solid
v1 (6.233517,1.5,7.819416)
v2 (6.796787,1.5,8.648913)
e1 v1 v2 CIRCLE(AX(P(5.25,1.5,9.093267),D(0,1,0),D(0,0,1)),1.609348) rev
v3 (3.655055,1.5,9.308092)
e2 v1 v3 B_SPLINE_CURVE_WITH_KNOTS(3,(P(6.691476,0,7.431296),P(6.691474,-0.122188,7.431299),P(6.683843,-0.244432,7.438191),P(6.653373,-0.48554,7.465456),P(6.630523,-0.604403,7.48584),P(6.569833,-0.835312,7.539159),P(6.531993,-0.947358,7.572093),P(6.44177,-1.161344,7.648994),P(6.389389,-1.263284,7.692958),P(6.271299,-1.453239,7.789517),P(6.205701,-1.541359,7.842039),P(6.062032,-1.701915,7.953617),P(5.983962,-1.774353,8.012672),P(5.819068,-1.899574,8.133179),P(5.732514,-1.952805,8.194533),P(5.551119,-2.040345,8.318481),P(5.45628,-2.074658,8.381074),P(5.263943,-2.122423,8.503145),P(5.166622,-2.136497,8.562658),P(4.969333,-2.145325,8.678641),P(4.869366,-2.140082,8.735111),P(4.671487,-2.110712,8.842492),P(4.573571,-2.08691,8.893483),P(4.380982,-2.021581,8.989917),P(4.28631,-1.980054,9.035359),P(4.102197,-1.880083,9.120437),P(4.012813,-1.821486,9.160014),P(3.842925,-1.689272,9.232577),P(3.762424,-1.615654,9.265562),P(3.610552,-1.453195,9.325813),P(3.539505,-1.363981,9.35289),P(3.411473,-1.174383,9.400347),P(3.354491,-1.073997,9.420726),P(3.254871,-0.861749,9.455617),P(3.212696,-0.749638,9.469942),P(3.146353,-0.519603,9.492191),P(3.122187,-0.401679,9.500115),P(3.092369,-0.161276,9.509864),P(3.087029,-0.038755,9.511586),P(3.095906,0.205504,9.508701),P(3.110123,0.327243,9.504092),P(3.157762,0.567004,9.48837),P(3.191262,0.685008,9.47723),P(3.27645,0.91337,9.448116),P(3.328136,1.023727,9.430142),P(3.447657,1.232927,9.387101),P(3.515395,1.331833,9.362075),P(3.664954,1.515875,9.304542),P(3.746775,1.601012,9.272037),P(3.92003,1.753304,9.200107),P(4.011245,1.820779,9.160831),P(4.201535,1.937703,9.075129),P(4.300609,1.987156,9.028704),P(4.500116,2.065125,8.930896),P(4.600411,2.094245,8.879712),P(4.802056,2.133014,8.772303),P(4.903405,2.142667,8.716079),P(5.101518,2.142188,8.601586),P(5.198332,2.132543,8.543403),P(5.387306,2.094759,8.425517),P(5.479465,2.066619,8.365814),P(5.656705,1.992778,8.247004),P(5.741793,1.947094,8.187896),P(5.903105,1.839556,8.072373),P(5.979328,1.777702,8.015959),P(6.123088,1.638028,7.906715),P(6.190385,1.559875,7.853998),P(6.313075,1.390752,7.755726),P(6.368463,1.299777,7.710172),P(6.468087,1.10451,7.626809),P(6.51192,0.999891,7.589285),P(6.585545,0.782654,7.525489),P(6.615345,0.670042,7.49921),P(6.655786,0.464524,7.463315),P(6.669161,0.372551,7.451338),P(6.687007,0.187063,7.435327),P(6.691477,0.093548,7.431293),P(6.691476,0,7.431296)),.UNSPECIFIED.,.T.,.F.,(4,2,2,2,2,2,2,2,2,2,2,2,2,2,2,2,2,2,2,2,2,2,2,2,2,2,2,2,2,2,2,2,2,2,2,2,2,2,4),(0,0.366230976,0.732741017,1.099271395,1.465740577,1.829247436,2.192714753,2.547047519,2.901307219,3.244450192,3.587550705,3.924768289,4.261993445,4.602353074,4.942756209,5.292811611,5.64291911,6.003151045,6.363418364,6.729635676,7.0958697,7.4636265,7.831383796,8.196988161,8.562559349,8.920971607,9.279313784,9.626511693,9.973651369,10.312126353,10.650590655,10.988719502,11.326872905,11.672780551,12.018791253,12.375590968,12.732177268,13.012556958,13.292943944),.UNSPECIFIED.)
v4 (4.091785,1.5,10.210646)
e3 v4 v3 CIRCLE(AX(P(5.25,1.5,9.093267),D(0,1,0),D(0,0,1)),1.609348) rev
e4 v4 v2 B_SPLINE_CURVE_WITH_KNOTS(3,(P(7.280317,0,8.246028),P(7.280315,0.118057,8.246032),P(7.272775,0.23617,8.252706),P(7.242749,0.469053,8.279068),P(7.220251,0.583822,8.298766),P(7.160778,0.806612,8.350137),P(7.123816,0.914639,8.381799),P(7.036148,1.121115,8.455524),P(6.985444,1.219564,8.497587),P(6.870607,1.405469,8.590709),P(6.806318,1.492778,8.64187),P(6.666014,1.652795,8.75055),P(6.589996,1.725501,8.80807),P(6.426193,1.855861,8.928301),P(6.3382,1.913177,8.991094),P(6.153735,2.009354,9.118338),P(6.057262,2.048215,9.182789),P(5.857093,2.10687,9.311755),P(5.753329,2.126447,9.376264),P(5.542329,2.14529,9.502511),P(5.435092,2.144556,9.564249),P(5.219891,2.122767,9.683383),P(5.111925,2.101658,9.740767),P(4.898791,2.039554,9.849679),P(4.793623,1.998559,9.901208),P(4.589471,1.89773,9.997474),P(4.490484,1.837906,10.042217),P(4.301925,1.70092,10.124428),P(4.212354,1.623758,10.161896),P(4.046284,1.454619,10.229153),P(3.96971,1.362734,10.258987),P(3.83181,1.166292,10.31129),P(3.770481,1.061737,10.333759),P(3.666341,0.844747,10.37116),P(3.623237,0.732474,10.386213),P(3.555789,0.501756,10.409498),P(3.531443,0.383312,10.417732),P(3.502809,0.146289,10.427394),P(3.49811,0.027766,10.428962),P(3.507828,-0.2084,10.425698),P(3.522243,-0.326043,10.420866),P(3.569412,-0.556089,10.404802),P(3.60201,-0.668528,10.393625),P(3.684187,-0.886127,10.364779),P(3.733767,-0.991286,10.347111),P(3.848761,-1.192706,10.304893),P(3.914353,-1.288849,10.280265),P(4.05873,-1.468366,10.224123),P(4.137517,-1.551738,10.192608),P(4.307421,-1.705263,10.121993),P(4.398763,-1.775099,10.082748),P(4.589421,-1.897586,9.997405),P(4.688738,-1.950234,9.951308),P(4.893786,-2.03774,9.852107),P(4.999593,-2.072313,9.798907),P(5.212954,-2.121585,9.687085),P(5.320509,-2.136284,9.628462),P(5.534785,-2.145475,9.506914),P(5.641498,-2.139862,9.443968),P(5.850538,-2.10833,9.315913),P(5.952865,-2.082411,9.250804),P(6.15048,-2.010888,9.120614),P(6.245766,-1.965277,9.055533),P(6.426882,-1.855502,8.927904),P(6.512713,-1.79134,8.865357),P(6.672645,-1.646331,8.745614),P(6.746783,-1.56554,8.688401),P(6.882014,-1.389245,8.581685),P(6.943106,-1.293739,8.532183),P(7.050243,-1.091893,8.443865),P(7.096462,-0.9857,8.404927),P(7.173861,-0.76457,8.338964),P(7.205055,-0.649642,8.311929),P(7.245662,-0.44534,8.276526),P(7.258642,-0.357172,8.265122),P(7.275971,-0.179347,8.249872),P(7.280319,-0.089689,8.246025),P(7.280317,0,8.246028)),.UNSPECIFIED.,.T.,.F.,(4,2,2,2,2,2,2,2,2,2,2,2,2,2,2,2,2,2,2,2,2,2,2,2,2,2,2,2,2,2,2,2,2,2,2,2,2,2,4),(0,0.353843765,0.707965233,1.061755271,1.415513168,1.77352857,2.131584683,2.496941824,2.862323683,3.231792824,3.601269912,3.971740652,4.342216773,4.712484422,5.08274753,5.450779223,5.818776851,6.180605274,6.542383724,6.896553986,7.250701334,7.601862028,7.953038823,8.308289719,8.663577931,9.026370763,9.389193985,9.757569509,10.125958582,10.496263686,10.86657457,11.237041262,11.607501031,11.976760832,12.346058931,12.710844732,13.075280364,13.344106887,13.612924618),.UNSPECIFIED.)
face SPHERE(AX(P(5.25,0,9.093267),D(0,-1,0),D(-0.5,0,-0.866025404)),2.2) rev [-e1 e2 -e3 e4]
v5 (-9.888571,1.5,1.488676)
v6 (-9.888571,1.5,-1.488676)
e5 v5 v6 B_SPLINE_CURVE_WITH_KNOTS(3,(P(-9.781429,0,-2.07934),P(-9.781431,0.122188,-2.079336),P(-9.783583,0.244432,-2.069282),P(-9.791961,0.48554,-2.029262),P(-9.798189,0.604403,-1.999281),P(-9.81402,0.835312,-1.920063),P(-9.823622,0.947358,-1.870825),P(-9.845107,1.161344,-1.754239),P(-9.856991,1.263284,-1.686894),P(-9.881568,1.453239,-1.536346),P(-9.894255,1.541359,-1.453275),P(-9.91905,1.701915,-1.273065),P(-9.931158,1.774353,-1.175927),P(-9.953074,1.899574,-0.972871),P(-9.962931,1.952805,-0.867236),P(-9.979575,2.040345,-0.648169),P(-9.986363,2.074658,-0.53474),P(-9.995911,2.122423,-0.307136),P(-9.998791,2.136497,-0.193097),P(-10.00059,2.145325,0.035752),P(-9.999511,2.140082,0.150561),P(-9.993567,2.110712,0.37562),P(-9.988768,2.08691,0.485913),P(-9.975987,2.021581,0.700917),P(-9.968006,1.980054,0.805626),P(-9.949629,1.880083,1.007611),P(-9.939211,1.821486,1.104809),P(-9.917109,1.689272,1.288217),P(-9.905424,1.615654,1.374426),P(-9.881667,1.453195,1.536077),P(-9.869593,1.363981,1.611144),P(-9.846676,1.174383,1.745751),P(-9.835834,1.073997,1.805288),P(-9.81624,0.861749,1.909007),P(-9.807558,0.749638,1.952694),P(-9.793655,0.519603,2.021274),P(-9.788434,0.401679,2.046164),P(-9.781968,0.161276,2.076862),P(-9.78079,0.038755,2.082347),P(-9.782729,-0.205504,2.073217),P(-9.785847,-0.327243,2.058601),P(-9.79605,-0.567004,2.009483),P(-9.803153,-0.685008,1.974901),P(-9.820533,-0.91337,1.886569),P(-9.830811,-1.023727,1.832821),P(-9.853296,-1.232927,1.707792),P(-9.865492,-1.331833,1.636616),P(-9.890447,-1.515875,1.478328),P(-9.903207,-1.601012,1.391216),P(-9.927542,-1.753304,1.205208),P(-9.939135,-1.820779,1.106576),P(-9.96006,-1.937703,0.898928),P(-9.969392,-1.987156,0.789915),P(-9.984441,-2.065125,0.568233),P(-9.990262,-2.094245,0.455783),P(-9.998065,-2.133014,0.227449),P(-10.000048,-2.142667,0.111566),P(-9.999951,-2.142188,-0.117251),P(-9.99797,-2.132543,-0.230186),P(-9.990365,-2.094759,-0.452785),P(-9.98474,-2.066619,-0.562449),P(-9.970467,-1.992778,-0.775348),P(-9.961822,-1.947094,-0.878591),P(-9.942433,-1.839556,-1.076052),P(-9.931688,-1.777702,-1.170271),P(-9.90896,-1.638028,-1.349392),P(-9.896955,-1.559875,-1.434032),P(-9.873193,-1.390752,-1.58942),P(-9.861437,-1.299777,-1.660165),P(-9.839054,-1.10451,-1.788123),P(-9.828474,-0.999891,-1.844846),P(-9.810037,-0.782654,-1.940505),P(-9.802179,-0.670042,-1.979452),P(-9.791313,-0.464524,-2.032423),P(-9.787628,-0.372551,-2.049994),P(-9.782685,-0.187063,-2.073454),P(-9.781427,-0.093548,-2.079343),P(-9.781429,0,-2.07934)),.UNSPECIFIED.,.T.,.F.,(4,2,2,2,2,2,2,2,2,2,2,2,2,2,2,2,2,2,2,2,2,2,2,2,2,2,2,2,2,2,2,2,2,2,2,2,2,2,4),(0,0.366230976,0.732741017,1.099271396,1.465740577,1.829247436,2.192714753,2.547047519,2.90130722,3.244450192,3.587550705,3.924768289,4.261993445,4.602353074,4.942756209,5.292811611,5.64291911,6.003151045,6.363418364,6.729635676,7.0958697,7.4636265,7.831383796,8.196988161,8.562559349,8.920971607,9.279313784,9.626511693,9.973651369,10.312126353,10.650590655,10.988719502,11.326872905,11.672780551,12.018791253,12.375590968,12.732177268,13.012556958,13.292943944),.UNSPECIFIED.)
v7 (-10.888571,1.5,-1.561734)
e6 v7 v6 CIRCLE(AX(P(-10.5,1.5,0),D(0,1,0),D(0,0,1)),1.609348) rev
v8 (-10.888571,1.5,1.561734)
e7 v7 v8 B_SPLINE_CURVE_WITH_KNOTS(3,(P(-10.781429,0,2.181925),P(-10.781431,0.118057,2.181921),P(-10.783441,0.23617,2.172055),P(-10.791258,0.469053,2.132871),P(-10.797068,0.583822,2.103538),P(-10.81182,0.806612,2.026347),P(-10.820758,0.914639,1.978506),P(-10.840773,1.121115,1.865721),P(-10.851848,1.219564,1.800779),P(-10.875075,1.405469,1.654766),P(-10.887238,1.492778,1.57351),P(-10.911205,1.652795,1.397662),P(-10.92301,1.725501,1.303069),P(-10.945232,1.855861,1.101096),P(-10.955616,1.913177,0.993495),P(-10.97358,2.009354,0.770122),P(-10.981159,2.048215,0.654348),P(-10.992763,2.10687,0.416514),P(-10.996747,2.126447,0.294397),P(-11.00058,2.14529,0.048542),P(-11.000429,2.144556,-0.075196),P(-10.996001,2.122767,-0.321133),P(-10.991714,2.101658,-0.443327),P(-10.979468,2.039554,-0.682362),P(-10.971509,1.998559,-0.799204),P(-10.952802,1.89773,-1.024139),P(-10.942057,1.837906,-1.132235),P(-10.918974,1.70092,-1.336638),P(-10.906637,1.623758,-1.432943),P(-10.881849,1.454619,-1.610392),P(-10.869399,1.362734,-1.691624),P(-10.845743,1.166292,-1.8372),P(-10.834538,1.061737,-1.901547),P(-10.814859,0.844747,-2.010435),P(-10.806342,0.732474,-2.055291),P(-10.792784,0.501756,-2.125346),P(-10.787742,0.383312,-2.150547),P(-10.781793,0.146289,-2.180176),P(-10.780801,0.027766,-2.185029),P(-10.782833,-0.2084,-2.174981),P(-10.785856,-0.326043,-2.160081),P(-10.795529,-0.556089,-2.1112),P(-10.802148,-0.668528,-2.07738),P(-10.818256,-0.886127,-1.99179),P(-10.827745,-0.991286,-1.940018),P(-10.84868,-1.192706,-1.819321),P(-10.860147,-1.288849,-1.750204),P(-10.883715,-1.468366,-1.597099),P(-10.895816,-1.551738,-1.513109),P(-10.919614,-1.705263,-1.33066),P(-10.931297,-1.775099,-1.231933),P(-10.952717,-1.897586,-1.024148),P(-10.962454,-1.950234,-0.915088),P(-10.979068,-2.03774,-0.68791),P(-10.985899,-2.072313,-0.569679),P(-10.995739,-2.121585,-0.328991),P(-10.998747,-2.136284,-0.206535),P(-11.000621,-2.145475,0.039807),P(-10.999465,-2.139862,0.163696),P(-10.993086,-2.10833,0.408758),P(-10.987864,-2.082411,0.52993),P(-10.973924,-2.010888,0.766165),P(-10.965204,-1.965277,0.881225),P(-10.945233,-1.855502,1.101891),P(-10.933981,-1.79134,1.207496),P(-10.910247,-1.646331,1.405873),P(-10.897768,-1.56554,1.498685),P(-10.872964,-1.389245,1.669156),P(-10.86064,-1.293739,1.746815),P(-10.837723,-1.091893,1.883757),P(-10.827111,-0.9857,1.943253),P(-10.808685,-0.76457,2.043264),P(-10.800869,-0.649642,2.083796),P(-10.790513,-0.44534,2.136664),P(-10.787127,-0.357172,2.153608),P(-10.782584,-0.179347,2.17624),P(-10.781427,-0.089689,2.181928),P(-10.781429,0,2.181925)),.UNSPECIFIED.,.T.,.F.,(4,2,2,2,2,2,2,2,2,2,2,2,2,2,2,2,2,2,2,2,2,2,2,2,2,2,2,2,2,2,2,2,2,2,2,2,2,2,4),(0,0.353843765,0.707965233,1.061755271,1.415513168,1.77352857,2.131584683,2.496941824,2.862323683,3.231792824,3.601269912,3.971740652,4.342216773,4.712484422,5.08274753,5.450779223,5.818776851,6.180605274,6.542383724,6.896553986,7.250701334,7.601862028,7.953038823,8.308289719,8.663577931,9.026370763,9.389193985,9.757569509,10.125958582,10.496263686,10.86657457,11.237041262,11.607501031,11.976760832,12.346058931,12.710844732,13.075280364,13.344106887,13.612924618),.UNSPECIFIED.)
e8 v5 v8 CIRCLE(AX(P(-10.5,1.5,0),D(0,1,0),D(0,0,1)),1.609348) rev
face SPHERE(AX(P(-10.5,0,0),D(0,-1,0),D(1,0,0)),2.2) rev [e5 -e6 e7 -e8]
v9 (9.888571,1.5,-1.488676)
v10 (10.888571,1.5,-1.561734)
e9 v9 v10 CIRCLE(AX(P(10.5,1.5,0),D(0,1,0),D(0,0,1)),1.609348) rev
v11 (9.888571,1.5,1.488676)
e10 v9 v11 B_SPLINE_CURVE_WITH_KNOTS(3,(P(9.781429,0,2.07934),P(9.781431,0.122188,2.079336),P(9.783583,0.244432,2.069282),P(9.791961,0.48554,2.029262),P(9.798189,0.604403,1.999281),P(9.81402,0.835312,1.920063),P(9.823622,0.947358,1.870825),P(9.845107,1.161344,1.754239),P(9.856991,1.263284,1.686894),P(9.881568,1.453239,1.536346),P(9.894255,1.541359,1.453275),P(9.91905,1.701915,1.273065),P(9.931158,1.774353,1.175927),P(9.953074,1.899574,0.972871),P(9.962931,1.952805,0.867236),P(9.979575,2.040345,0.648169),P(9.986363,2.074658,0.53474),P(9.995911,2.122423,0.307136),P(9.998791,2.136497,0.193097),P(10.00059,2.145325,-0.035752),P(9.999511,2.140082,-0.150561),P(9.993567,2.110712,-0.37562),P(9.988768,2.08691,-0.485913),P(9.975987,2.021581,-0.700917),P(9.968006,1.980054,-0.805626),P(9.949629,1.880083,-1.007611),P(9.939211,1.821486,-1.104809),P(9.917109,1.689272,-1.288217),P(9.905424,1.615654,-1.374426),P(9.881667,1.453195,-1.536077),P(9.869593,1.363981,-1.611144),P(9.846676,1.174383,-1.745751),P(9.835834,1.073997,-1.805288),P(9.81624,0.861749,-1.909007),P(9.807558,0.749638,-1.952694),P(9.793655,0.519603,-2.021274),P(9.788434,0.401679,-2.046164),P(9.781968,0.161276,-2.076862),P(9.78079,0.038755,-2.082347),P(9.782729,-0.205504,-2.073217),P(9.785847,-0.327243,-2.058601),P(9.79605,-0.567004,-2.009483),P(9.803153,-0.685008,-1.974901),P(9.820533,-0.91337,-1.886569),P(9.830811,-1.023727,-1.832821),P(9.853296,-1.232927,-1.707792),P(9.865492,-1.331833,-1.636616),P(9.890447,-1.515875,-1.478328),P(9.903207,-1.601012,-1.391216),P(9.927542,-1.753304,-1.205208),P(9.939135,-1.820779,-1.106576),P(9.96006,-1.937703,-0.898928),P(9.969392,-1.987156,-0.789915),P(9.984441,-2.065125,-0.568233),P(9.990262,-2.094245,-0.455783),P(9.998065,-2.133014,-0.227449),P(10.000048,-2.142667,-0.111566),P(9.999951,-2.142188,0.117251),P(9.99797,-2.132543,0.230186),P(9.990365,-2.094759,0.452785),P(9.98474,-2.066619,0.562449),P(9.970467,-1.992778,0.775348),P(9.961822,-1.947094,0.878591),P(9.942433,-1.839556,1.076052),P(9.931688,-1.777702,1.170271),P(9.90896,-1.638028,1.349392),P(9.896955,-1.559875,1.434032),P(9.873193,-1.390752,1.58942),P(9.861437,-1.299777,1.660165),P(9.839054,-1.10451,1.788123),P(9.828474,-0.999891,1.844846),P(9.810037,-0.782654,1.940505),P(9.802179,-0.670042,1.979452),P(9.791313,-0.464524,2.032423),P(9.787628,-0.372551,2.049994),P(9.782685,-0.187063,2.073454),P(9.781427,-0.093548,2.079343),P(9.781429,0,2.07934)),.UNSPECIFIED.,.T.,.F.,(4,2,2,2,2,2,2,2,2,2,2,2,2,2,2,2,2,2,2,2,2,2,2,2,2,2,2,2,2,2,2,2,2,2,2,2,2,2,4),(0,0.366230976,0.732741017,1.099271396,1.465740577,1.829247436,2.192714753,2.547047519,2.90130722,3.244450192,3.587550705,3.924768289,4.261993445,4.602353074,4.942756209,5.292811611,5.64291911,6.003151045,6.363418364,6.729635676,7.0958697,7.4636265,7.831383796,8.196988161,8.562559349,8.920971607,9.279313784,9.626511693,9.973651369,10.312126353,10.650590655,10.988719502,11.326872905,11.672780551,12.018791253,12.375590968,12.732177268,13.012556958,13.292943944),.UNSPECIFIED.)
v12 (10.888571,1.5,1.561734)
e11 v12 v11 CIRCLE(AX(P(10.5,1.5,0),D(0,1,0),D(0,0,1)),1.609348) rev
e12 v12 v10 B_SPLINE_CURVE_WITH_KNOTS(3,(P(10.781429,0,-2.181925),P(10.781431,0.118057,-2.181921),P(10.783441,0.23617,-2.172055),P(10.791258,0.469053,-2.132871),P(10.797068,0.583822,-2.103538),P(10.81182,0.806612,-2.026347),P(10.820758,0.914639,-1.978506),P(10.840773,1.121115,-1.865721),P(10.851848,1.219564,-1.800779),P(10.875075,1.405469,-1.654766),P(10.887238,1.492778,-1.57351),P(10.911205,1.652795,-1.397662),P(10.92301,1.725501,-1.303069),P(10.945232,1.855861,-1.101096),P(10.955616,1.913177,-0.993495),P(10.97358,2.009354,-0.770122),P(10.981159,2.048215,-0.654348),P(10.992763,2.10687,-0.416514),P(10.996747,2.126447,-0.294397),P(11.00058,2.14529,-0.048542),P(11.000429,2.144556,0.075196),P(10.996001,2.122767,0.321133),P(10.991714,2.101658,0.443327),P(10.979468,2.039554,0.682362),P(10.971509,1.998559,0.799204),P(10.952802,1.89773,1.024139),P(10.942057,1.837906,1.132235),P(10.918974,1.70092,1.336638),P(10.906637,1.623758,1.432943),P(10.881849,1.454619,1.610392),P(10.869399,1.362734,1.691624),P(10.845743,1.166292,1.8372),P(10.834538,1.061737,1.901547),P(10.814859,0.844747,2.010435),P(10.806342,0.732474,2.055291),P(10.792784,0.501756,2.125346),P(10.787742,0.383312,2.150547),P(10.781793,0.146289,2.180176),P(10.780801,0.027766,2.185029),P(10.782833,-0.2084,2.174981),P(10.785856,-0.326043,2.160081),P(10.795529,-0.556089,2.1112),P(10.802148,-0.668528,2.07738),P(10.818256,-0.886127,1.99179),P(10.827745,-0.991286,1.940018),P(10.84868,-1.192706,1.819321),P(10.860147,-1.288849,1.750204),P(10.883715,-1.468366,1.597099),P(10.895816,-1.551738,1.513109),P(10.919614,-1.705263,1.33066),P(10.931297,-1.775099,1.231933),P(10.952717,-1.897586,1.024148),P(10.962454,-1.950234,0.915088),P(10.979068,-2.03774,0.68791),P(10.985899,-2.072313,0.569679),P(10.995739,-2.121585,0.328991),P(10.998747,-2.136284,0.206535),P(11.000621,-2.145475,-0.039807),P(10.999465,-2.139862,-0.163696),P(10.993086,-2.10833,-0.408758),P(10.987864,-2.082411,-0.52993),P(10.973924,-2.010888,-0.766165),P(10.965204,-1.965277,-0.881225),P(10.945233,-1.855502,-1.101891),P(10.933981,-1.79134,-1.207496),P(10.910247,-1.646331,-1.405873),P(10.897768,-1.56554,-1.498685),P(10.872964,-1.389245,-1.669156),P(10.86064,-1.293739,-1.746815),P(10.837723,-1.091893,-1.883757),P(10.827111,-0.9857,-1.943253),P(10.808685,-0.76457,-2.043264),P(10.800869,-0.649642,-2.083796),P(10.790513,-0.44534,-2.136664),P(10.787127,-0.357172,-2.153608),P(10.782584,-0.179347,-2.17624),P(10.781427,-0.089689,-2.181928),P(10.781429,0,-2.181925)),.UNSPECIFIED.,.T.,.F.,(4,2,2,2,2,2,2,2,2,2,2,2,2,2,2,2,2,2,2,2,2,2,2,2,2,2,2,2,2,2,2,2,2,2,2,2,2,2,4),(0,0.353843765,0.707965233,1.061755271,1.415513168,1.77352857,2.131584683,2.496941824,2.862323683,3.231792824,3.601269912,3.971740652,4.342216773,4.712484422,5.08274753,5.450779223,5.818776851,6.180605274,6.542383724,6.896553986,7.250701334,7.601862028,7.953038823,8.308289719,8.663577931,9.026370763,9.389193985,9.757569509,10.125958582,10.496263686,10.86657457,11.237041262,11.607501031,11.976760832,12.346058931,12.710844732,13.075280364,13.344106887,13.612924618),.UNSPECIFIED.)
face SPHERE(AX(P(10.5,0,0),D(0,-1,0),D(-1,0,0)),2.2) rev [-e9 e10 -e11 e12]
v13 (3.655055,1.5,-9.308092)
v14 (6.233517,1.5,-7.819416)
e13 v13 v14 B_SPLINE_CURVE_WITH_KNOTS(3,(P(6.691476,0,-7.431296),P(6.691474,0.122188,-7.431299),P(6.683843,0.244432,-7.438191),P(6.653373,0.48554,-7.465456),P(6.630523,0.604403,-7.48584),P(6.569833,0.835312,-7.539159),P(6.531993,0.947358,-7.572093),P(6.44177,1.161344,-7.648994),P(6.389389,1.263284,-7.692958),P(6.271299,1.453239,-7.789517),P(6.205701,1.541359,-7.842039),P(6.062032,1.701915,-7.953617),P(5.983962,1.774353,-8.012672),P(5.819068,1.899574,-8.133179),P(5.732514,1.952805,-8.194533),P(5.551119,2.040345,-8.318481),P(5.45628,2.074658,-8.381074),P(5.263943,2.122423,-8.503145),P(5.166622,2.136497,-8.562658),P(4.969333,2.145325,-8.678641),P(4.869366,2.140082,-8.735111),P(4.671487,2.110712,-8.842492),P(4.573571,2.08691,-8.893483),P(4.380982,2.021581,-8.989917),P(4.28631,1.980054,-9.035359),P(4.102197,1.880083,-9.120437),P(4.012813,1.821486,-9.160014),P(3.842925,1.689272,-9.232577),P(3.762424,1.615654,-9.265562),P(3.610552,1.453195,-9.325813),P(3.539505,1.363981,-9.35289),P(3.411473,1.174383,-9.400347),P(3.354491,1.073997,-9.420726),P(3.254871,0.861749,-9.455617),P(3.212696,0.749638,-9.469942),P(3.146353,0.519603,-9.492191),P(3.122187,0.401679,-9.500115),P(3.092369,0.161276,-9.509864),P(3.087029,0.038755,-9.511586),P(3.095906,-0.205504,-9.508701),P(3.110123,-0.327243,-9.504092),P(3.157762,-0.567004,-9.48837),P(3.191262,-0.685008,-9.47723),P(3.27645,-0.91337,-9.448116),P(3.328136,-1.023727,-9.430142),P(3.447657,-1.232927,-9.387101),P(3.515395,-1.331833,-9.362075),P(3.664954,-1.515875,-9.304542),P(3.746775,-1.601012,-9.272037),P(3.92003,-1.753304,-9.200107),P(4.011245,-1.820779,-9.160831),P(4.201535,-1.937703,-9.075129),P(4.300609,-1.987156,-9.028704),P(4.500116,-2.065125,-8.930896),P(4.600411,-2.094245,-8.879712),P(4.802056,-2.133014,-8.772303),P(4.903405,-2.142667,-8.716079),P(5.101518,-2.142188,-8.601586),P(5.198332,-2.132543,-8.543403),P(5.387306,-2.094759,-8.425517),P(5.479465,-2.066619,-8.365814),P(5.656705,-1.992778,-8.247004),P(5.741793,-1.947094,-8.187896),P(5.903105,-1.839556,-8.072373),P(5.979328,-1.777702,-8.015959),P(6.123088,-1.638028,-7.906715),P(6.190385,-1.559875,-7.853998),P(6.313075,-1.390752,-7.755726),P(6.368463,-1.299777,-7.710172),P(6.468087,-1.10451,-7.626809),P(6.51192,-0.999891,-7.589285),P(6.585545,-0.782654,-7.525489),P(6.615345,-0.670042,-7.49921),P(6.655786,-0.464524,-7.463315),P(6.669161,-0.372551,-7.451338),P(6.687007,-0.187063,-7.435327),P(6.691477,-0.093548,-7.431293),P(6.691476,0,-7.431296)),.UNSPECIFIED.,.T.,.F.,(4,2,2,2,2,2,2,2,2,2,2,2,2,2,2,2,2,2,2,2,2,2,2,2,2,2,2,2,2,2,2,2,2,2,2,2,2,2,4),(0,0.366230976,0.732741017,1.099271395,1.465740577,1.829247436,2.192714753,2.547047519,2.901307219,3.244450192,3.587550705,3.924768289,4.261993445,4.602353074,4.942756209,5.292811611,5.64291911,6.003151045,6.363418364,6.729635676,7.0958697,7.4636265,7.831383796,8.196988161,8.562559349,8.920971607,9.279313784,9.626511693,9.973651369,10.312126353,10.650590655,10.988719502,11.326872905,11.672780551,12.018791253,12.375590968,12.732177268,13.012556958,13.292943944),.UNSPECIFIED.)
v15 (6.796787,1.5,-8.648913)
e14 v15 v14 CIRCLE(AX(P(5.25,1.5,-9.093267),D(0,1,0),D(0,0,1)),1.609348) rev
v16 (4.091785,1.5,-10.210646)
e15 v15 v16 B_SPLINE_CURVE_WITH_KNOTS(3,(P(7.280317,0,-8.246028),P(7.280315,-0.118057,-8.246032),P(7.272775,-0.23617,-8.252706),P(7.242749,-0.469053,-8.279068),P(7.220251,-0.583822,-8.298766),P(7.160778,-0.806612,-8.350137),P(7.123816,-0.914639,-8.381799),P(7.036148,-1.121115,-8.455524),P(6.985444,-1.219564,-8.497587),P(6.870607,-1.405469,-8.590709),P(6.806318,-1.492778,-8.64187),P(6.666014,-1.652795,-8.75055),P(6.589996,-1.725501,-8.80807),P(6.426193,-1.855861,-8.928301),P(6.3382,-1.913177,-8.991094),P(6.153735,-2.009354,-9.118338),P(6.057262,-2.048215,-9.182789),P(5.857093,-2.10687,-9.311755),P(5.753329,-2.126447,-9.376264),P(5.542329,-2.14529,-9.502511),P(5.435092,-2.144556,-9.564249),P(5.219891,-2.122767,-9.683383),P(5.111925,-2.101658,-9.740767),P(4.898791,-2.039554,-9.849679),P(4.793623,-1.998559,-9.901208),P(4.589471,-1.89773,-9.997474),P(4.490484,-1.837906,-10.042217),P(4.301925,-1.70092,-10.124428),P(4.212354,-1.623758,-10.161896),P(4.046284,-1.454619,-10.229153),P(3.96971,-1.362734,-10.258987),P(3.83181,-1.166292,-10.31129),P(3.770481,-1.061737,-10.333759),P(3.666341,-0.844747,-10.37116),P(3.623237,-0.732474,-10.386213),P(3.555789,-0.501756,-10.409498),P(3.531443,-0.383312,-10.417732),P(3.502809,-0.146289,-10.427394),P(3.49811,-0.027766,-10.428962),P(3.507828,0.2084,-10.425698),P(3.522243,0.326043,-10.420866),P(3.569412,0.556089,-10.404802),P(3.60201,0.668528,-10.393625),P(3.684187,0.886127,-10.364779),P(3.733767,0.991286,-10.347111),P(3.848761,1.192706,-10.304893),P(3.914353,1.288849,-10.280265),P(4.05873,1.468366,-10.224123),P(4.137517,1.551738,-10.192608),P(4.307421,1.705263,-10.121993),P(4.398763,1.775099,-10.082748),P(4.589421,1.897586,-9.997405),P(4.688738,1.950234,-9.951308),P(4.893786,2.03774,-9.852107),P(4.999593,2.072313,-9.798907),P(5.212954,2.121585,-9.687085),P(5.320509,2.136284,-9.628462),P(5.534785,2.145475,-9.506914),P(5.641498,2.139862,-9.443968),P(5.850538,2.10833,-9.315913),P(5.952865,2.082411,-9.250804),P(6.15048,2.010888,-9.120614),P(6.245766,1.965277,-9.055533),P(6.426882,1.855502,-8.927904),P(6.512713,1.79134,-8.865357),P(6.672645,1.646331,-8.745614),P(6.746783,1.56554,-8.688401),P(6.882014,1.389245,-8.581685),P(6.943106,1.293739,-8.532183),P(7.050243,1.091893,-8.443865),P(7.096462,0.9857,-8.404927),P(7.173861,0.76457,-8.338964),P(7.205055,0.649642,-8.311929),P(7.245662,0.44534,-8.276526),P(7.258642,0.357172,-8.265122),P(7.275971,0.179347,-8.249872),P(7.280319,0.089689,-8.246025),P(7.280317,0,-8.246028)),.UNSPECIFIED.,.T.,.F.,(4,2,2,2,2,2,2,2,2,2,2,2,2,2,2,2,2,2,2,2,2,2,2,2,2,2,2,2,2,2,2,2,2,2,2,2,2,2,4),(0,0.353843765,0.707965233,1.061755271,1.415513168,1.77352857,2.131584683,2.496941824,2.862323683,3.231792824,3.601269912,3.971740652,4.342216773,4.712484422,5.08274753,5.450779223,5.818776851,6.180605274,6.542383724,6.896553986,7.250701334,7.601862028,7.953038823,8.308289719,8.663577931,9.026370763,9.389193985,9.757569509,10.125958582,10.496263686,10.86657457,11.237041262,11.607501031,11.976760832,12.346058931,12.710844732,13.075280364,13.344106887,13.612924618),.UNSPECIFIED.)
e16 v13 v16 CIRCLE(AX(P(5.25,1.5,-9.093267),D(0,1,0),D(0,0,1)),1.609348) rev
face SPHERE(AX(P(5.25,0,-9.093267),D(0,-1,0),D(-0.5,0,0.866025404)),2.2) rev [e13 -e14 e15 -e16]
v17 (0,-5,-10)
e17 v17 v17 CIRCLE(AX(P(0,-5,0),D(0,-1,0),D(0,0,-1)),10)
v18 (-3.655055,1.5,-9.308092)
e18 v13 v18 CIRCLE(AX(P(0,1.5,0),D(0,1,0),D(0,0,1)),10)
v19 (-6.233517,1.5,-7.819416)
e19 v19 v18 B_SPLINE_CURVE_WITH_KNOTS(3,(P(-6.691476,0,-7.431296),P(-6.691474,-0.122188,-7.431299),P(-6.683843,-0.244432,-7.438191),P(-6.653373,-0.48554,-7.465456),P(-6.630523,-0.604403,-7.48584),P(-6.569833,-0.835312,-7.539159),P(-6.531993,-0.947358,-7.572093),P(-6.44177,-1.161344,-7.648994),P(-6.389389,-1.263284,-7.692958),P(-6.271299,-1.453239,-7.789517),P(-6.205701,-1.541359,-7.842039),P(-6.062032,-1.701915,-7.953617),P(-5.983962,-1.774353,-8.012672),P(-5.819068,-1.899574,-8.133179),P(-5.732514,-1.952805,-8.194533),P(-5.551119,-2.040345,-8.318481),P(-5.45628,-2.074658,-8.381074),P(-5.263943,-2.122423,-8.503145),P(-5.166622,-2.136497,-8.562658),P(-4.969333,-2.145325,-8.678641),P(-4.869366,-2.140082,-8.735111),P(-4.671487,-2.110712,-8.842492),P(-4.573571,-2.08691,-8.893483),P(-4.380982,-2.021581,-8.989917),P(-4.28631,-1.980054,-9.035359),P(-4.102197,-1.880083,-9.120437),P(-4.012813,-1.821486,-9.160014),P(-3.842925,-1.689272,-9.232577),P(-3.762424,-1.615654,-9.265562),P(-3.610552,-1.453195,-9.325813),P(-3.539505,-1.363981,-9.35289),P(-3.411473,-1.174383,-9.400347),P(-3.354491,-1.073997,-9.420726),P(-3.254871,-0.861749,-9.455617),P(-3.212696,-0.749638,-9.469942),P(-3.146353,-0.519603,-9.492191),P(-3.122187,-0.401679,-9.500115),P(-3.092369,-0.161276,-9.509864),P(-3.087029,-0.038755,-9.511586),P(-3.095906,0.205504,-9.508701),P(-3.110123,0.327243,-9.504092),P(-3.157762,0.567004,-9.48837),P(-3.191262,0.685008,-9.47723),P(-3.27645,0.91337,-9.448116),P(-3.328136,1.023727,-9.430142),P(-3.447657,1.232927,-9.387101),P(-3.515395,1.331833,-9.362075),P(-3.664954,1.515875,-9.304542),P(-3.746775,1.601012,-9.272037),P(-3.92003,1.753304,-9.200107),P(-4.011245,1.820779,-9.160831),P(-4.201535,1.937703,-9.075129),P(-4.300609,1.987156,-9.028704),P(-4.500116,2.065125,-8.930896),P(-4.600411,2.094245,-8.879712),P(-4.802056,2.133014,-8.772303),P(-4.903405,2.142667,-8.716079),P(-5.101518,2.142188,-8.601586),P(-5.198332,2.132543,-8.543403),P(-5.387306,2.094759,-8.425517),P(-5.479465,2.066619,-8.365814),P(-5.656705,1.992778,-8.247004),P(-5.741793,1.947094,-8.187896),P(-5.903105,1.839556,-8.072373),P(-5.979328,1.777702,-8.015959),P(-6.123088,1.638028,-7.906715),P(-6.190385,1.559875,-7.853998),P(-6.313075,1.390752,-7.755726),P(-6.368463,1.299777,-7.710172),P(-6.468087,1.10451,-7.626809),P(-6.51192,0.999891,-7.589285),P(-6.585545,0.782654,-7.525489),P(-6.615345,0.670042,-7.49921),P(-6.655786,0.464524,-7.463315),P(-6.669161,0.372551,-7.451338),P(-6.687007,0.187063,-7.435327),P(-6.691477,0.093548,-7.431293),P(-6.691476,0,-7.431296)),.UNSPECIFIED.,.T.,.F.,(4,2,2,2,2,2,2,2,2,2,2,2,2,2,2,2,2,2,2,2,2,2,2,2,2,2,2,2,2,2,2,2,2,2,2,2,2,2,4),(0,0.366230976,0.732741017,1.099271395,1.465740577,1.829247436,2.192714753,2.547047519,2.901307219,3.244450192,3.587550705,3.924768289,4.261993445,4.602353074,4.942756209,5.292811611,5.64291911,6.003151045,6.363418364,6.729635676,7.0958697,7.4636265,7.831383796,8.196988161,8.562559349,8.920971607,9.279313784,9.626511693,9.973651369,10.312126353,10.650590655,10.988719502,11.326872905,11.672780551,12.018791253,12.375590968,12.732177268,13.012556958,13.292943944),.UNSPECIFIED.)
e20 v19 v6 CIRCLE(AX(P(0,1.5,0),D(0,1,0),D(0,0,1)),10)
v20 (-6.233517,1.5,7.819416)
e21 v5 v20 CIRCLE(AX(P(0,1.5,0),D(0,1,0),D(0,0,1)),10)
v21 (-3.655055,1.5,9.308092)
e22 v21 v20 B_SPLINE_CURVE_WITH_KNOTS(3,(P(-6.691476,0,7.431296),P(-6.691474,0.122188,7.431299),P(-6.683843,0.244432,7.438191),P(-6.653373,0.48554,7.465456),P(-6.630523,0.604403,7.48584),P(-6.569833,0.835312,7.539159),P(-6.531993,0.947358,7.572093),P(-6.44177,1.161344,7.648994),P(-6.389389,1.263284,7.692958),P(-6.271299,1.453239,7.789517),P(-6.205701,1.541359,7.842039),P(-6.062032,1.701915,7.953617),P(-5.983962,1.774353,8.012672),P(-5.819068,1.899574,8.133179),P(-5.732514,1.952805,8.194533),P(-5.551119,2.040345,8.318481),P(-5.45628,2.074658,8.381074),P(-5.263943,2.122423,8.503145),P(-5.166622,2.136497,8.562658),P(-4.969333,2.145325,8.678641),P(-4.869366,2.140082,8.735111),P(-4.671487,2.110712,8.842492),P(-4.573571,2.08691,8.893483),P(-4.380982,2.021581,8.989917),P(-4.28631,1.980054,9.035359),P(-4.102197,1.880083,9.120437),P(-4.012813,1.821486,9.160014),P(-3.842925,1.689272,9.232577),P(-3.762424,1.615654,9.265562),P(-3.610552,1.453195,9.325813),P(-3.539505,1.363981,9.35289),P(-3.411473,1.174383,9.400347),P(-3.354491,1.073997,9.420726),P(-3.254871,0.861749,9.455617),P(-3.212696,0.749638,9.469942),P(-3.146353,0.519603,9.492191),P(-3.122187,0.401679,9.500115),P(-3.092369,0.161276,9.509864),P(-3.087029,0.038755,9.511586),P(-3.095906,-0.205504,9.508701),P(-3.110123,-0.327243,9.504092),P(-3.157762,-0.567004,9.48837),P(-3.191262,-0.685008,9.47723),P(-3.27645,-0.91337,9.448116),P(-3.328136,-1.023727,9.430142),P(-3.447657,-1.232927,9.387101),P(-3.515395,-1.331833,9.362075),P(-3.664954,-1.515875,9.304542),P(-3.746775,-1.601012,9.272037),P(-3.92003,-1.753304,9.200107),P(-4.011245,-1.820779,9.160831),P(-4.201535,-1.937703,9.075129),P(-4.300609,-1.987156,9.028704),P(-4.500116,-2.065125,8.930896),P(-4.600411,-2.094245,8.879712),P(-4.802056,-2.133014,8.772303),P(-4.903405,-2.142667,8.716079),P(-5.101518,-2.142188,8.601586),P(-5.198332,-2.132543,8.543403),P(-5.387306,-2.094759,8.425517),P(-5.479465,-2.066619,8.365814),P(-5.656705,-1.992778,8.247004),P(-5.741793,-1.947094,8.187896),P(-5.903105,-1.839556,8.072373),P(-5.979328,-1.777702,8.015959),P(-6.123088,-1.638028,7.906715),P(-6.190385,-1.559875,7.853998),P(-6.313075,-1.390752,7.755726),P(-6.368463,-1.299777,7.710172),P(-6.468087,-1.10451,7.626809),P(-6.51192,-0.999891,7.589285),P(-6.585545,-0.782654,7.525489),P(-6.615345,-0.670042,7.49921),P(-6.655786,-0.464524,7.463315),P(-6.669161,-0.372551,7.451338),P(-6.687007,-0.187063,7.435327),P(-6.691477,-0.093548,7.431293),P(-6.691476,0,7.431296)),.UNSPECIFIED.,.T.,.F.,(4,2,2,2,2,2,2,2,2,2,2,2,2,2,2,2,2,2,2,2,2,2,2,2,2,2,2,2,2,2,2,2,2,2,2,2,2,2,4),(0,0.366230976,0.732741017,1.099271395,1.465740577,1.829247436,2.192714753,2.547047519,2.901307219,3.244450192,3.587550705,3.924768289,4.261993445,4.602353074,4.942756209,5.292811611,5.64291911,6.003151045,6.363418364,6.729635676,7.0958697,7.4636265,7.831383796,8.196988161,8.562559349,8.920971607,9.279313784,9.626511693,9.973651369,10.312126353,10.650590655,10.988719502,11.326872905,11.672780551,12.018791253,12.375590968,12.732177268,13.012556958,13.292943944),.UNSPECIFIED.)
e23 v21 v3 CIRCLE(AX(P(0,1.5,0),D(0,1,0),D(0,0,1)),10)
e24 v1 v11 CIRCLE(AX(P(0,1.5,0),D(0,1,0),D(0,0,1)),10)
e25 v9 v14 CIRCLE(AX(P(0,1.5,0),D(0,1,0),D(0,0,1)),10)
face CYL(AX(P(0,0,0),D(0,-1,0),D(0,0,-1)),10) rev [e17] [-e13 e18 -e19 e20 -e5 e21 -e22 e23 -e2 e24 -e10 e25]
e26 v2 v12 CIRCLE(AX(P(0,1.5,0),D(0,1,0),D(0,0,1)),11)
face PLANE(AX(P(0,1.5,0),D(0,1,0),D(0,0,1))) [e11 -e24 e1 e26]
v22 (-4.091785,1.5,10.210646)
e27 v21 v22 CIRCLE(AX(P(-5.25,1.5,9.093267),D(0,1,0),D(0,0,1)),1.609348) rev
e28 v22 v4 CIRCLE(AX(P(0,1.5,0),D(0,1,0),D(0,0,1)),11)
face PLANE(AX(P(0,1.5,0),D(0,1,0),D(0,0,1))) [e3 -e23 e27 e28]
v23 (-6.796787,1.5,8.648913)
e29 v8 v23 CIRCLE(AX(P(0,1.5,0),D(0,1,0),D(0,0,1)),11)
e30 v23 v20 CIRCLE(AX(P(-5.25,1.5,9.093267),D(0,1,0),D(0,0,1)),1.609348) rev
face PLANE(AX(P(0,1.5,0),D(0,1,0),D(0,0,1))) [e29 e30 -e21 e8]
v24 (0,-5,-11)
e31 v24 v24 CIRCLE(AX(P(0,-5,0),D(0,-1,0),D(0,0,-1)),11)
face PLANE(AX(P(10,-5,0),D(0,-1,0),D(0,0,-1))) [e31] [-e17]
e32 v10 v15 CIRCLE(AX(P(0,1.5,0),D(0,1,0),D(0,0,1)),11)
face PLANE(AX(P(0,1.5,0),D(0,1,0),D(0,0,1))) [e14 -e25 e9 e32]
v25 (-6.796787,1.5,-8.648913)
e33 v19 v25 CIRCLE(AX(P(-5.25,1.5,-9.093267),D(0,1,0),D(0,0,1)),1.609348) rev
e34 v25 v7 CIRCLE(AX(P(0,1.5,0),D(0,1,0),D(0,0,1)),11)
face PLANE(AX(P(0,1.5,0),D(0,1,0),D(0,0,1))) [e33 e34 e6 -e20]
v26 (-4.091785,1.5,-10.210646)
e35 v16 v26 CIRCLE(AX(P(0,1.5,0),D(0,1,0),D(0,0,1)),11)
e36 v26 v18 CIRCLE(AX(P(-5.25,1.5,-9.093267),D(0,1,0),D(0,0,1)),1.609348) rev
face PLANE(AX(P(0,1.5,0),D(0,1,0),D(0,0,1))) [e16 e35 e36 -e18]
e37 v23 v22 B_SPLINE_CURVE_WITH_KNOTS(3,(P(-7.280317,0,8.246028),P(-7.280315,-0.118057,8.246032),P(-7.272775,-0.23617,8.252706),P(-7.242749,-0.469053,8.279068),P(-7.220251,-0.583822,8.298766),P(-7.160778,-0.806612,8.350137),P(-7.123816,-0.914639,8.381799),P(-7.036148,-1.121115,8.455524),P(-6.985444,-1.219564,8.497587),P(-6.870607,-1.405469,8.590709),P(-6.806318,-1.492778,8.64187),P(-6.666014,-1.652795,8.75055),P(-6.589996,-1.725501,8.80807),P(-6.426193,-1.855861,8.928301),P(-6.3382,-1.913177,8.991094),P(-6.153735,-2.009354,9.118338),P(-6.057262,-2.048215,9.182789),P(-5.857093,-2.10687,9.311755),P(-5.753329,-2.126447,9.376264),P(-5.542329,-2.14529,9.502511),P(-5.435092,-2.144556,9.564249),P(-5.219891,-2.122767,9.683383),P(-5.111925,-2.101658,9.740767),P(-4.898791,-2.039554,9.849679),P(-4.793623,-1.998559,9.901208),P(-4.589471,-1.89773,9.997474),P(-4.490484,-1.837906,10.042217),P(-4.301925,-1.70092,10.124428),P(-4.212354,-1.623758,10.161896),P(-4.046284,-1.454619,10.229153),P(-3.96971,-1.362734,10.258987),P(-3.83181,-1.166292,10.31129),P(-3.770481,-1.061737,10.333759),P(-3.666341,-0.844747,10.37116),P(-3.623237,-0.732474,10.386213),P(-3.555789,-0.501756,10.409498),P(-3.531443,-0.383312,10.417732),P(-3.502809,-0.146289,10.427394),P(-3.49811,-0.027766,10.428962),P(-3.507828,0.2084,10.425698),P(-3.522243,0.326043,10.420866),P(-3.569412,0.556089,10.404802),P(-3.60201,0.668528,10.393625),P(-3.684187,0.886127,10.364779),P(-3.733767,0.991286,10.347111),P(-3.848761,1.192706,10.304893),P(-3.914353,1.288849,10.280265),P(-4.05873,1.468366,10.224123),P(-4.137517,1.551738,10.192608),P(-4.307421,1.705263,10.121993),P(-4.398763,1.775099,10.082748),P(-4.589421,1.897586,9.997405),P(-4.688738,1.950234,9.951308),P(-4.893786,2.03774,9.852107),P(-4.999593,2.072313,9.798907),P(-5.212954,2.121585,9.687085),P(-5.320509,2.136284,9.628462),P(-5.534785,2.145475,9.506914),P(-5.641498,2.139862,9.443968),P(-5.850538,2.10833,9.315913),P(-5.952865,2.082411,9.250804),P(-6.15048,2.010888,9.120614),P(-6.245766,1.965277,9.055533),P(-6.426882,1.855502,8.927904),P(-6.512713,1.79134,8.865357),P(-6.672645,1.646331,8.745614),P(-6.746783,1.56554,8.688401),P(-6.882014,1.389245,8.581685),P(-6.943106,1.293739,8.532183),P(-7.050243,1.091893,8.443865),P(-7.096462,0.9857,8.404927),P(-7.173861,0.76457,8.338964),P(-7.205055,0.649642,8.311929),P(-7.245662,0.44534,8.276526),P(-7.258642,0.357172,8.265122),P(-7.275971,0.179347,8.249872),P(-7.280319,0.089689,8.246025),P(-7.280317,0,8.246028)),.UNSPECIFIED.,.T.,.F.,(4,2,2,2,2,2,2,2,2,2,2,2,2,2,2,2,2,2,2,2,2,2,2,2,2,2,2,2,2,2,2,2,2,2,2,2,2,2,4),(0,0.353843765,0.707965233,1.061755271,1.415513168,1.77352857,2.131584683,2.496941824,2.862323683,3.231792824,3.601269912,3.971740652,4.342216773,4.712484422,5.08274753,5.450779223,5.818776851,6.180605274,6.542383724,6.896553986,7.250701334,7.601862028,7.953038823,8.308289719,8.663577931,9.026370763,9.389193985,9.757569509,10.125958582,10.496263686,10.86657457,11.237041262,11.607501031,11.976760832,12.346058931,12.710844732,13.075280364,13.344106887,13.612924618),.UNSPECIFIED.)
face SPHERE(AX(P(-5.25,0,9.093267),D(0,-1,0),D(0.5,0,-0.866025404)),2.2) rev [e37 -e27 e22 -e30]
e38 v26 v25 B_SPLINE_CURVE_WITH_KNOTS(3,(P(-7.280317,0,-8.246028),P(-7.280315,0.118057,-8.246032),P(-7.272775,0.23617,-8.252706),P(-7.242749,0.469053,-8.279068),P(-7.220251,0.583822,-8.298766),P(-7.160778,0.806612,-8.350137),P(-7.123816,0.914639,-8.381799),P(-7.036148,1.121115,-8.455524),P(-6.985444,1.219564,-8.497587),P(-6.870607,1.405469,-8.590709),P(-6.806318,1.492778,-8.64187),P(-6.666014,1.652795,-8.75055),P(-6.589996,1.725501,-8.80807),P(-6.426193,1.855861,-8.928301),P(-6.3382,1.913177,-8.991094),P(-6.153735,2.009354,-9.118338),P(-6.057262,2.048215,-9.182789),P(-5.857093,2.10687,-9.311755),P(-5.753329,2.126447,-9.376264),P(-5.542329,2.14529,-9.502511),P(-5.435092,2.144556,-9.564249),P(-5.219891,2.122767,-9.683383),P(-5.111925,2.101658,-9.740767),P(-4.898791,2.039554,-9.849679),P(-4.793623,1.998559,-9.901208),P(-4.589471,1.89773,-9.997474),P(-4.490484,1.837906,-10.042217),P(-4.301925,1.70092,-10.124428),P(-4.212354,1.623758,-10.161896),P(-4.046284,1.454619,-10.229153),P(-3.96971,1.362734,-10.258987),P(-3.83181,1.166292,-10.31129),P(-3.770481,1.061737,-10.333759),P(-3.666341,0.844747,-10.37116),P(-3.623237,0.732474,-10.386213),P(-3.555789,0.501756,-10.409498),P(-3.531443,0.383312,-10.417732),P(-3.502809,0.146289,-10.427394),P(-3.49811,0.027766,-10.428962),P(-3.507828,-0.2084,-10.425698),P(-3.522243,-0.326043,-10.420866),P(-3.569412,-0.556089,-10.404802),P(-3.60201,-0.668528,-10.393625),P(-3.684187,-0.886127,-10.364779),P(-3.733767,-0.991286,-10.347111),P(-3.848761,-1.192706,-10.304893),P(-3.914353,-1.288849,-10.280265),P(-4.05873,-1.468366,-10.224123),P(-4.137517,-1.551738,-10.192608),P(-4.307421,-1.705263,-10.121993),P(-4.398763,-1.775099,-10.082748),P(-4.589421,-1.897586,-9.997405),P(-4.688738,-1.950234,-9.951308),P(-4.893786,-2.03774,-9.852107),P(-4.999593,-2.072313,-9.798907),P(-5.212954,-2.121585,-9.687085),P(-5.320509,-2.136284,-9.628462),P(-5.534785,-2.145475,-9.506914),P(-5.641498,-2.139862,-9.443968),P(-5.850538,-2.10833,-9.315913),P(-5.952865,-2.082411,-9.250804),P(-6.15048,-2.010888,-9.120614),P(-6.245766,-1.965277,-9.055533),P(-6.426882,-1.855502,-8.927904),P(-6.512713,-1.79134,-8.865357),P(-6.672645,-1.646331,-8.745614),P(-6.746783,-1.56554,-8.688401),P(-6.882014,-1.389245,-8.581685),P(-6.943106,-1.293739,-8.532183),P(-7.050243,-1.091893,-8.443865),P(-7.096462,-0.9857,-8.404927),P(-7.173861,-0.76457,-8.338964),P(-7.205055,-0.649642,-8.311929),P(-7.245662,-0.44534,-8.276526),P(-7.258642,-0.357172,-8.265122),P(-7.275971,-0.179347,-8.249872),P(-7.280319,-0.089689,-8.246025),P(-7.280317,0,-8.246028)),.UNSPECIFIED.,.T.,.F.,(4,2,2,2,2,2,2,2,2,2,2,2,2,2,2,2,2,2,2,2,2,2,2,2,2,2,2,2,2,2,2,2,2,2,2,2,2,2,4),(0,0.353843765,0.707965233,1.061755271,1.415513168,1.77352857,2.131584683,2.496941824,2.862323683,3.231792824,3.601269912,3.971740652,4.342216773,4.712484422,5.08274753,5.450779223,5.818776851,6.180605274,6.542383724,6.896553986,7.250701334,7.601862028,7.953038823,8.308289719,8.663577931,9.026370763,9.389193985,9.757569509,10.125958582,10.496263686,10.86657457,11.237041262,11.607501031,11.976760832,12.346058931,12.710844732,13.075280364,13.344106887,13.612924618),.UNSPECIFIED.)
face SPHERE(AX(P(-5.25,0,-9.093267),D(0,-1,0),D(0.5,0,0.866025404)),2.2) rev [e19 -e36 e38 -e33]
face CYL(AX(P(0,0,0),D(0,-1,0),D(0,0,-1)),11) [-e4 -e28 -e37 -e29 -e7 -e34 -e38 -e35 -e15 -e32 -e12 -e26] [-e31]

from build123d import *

# Parameters (mm, degrees)
SKETCH3_W          = 1
SKETCH3_H          = 10
CIRPATTERN1_COUNT  = 6
SKETCH5_R          = 11
SKETCH5_R_2        = 10
CUT_EXTRUDE1_DEPTH = 3.5


with BuildPart() as part:
    # Sketch3 → Revolve3 (revolve)
    with BuildSketch(Plane.XY):
        with Locations((10.5, 0)):
            Rectangle(SKETCH3_W, SKETCH3_H)
    revolve(axis=Axis((0, 0, 0), (0, 1, 0)))

    # Sketch4 → Cut-Revolve1 (revolve, cut)
    with BuildSketch(Plane.XY):
        with BuildLine():
            Line((10.5, 2.2), (10.5, -2.2))
            ThreePointArc((10.5, -2.2), (12.055634919, -1.555634919), (12.7, 0))
            ThreePointArc((12.7, 0), (12.055634919, 1.555634919), (10.5, 2.2))
        make_face()
    cut_revolve1 = revolve(axis=Axis((10.5, -2.2, 0), (0, 1, 0)), mode=Mode.SUBTRACT)

    # CirPattern1: Cut-Revolve1 ×6 about axis
    cirpattern1_axis = Axis((0, 5, 0), (0, -1, 0))
    for i in range(1, CIRPATTERN1_COUNT):
        add(cut_revolve1.rotate(cirpattern1_axis, i * 360 / CIRPATTERN1_COUNT), mode=Mode.SUBTRACT)

    # Sketch5 → Cut-Extrude1 (cut)
    with BuildSketch(Plane(origin=(0, 5, 0), x_dir=(1, 0, 0), z_dir=(0, 1, 0))):
        Circle(SKETCH5_R)
        Circle(SKETCH5_R_2, mode=Mode.SUBTRACT)
    extrude(amount=-CUT_EXTRUDE1_DEPTH, mode=Mode.SUBTRACT)


solid = part.part
